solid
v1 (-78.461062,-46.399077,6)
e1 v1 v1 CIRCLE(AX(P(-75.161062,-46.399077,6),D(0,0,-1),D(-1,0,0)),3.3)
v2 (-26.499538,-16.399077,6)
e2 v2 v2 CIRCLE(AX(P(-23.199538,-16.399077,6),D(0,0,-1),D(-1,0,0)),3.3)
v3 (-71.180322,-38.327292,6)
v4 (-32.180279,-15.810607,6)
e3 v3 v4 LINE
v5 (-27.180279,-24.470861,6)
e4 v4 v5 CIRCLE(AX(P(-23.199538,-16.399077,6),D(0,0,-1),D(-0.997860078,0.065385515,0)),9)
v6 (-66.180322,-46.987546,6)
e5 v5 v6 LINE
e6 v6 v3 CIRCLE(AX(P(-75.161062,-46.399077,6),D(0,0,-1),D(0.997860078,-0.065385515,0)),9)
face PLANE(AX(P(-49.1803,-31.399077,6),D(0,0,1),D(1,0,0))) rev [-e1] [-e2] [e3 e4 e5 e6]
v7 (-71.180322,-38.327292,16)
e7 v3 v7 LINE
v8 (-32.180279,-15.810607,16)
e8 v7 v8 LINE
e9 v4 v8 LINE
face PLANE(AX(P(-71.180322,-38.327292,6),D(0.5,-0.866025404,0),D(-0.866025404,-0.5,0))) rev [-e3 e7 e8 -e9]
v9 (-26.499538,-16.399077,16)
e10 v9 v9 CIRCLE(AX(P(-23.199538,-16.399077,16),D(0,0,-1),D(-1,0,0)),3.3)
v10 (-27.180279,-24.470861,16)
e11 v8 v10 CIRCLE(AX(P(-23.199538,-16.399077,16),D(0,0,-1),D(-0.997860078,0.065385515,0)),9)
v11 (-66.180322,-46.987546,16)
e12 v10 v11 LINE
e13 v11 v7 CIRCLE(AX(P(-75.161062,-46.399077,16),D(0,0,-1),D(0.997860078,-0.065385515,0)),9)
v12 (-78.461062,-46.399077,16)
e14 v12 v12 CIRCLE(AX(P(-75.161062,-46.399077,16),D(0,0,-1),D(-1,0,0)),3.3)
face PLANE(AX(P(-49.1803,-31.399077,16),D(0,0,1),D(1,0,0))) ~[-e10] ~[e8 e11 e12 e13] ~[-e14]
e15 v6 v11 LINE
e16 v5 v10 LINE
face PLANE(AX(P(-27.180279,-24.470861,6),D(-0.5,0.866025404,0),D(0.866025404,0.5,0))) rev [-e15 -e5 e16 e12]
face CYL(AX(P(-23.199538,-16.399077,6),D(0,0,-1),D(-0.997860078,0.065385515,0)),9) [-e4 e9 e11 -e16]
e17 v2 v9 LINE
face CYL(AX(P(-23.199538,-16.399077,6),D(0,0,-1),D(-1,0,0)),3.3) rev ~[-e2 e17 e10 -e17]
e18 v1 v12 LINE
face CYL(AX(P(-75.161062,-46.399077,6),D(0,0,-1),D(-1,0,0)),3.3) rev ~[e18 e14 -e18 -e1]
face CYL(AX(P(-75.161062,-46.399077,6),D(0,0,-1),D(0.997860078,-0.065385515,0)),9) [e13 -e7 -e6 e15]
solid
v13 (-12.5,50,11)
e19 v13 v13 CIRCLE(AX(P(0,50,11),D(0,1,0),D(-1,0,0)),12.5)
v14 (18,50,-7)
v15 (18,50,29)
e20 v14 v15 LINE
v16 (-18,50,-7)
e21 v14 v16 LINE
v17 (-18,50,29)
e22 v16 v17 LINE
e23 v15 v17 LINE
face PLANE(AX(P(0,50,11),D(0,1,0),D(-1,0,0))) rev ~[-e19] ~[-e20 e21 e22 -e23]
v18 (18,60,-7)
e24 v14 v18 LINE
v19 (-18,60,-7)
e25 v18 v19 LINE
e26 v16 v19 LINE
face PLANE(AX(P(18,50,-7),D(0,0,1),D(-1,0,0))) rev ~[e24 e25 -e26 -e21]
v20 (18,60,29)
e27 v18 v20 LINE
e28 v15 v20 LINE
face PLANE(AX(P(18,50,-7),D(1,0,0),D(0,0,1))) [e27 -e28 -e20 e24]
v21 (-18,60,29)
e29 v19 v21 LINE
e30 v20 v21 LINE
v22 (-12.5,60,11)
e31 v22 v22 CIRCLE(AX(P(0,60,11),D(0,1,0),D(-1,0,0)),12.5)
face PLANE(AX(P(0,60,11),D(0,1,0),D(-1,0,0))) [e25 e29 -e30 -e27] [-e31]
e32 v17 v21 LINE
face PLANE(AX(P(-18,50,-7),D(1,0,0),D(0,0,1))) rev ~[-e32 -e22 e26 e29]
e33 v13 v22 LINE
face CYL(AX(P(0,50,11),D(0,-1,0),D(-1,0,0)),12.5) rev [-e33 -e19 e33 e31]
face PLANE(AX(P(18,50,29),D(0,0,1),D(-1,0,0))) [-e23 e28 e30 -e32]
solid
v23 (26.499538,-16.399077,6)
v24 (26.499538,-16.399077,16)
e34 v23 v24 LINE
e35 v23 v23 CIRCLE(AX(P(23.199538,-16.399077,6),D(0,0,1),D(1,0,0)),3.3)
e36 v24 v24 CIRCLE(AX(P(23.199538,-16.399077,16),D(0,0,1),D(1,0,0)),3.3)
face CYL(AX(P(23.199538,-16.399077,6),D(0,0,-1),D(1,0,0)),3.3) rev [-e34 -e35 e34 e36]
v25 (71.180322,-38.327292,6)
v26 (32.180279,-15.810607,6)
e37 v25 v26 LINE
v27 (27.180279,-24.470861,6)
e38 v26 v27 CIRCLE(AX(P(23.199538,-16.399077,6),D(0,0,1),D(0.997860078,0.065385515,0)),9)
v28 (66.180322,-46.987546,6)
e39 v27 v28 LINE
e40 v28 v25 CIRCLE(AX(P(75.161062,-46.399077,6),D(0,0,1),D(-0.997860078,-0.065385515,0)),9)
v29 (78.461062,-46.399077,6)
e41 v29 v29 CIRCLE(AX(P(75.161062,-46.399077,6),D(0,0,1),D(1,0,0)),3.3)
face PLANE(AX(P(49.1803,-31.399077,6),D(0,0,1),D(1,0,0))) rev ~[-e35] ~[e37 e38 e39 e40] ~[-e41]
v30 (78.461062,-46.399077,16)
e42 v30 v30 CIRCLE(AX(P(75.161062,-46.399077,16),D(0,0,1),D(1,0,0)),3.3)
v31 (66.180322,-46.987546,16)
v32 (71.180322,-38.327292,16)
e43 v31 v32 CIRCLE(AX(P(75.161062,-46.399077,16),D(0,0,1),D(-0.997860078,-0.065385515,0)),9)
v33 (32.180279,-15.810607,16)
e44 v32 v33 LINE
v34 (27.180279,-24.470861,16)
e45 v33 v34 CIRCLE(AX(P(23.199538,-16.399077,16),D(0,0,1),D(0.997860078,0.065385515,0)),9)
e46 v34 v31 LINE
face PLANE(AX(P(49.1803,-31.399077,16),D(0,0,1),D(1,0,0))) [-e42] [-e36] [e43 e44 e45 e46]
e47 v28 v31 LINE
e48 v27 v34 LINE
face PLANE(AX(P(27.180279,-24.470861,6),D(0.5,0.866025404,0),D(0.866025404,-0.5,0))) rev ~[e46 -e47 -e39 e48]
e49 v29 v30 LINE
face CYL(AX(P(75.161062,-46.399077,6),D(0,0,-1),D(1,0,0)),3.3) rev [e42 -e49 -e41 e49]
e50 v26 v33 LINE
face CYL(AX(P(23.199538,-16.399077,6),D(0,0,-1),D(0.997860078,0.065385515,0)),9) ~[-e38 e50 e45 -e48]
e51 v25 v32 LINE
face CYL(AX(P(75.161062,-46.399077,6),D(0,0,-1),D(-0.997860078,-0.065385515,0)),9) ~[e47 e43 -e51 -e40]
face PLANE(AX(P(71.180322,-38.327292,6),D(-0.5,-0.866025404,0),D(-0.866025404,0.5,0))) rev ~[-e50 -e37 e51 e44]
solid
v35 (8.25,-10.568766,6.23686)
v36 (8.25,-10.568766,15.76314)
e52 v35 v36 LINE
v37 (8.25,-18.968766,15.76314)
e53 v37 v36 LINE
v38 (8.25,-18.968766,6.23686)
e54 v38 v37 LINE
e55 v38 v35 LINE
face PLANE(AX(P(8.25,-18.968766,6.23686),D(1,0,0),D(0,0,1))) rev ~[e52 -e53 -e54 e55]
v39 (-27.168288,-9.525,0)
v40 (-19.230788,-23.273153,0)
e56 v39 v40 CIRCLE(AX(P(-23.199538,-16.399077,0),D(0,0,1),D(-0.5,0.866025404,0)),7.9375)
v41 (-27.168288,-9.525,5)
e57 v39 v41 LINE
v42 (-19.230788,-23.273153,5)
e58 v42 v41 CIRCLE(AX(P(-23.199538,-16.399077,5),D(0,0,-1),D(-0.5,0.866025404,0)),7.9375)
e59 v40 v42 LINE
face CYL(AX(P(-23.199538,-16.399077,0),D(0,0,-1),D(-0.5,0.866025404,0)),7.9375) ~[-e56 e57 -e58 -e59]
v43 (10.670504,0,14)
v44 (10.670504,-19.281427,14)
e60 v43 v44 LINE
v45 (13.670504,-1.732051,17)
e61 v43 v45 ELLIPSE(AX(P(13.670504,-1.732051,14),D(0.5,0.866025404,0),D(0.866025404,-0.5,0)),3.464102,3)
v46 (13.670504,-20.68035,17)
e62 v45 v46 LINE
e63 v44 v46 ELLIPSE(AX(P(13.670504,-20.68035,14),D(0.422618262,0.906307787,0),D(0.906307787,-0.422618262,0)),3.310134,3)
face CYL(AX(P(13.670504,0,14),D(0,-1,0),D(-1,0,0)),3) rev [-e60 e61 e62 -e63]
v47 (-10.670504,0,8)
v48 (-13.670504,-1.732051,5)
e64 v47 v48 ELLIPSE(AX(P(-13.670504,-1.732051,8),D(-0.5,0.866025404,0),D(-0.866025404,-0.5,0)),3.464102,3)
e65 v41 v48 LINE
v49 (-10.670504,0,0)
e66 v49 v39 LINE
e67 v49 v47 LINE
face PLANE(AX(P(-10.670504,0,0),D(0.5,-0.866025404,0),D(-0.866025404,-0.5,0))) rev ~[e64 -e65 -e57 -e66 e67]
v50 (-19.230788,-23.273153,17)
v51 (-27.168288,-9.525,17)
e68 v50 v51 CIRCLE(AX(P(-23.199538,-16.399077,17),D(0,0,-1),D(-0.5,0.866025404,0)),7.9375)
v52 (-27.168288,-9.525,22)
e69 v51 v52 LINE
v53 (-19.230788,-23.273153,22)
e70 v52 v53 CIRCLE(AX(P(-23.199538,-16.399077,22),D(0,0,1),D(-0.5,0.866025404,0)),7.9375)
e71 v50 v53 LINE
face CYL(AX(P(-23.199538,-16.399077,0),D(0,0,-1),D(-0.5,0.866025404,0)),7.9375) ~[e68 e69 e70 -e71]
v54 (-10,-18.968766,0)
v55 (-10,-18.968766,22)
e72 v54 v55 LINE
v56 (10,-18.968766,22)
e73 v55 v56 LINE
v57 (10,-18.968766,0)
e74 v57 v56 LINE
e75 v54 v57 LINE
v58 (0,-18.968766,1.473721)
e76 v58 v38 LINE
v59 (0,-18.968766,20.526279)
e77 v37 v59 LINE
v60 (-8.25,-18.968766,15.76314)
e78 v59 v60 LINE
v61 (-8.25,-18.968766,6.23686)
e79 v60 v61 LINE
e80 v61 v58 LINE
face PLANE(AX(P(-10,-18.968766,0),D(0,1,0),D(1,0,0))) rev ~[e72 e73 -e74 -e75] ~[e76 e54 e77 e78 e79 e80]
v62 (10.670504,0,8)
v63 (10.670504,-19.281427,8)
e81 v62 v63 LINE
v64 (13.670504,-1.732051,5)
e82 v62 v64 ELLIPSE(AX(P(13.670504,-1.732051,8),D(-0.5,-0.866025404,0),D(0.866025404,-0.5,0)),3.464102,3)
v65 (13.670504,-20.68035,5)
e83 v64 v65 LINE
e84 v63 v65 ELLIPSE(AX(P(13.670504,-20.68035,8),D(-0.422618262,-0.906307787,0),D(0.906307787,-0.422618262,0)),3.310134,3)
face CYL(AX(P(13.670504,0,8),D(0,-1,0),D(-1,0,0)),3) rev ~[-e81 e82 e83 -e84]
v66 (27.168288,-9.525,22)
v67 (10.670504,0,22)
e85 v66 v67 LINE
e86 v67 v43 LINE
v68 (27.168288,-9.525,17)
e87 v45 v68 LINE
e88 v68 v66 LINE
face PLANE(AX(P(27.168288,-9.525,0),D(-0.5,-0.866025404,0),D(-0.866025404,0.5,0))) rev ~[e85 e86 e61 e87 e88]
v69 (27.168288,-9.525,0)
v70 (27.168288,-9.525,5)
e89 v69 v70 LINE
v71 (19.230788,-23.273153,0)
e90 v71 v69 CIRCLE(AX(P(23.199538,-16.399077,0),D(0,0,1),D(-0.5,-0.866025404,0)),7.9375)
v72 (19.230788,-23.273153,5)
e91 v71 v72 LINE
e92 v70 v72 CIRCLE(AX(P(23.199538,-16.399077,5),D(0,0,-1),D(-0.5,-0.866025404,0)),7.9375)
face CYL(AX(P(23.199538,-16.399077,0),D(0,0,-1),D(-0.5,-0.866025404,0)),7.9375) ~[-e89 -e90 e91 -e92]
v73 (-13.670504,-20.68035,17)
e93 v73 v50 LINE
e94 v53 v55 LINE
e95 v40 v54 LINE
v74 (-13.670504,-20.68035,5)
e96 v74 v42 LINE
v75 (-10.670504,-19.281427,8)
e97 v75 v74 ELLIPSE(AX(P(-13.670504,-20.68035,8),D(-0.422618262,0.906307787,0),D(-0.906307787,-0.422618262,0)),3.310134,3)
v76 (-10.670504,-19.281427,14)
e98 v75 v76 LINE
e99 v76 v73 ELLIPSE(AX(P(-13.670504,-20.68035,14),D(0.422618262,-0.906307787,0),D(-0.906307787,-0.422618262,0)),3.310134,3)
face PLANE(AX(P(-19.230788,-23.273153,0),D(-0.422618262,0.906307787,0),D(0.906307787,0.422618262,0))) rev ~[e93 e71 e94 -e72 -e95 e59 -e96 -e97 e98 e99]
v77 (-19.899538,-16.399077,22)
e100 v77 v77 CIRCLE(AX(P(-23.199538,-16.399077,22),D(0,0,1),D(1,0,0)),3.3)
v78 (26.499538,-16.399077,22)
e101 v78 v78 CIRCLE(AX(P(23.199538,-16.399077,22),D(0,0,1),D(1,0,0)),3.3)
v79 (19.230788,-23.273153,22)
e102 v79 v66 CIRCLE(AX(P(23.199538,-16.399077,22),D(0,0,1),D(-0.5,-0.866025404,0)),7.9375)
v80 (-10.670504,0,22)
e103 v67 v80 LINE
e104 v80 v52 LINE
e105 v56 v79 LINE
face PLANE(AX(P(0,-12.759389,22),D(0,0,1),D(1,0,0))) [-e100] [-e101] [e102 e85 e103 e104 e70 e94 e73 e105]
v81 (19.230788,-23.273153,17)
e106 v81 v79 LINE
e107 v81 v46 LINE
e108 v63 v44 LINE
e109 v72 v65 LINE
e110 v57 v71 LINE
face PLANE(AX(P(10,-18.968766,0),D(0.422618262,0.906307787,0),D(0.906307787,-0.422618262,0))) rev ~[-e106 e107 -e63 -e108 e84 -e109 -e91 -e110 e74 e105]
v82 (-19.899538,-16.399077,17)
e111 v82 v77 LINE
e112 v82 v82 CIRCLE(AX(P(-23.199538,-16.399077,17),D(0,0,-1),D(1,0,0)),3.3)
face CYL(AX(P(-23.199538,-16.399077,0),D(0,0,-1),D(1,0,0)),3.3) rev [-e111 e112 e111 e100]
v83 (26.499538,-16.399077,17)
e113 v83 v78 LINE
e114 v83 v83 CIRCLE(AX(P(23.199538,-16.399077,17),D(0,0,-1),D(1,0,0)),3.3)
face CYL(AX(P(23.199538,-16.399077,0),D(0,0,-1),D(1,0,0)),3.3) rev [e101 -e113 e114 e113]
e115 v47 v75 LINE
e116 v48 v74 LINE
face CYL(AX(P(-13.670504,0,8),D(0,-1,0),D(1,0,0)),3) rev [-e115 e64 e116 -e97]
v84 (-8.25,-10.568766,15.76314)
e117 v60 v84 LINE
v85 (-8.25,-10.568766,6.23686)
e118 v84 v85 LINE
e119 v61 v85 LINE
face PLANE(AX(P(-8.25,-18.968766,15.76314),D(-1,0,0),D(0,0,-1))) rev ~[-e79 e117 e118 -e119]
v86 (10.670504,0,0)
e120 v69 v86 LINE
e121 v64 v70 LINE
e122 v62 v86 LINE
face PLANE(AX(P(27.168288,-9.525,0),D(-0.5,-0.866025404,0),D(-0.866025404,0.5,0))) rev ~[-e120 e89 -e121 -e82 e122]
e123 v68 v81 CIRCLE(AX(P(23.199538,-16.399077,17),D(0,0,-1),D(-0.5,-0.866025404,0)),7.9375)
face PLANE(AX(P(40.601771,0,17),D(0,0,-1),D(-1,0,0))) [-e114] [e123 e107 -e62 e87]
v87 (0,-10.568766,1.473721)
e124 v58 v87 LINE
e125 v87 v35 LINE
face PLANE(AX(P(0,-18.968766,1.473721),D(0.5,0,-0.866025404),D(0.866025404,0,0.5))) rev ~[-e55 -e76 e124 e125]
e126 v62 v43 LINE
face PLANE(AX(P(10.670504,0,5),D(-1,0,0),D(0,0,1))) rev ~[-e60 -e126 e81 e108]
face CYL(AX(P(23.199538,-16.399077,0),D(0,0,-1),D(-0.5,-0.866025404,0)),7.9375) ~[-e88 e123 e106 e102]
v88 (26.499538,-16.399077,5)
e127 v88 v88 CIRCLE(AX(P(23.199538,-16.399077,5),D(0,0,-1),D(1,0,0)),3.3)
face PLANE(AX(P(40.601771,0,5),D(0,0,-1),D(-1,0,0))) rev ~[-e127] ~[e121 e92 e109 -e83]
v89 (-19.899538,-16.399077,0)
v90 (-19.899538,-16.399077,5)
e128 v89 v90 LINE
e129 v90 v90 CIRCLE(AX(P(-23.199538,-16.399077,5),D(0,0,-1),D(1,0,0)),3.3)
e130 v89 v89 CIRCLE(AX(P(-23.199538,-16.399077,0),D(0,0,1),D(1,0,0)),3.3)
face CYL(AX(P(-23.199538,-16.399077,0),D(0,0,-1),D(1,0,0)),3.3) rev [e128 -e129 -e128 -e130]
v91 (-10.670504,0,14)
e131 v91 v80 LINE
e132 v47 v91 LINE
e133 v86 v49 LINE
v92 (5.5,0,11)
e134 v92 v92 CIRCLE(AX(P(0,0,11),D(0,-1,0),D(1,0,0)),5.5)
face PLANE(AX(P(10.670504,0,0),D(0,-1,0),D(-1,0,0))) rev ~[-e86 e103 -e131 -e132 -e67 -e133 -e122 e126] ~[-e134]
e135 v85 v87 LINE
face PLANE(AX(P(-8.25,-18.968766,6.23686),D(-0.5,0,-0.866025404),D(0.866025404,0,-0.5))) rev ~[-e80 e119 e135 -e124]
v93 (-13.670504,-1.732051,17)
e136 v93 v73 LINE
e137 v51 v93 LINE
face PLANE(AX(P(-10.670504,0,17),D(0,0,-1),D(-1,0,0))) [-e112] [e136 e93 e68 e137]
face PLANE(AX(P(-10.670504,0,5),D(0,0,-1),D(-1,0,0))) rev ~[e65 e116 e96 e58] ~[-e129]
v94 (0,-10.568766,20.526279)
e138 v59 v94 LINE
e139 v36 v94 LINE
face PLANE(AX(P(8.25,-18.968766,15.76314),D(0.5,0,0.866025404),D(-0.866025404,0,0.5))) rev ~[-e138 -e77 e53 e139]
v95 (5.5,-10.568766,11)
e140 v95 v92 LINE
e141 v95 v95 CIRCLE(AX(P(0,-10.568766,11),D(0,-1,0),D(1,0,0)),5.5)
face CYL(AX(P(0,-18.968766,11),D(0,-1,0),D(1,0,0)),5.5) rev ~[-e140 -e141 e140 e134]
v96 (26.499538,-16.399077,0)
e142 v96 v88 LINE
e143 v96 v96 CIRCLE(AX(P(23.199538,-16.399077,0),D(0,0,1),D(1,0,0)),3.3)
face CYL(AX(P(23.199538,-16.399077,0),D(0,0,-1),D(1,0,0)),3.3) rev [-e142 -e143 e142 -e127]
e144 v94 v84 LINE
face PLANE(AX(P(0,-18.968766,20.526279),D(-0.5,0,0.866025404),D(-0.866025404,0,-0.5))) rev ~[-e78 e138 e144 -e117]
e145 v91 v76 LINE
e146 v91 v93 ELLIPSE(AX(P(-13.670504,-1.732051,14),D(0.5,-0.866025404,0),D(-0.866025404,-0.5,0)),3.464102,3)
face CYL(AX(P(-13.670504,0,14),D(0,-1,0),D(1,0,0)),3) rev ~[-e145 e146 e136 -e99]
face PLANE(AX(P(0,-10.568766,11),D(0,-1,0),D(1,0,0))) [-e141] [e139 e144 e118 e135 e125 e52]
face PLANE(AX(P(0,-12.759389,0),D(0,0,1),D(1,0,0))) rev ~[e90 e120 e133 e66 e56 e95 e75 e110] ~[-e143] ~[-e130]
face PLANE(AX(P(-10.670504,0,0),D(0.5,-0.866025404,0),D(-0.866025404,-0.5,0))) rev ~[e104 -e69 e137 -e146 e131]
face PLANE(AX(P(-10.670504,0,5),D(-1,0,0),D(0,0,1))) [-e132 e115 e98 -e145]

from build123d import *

# Parameters (mm, degrees)
F0_R      = 3.3
F1_DEPTH  = 22
F2_R      = 5.5
F3_DEPTH  = 18.9697660486
F4_R      = 5.5
F5_DEPTH  = 8.4
F6_W      = 29.9312670497
F6_H      = 12
F7_DEPTH  = 24.3375766425
F8_R      = 3
F10_R     = 3.3
F11_DEPTH = 10
F14_W     = 36
F14_H     = 36
F14_R     = 12.5
F15_DEPTH = 10


with BuildPart() as f1:
    # F0 (on Top) → F1 (new body)
    with BuildSketch(Plane.XY):
        with BuildLine():
            Line((10.6705042752, 0), (0, 0))
            Line((0, 0), (-10.6705042752, 0))
            Line((-10.6705042752, 0), (-27.1682882173, -9.525))
            ThreePointArc((-27.1682882173, -9.525), (-30.0736148598, -20.3678266425), (-19.2307882173, -23.2731532851))
            Line((-19.2307882173, -23.2731532851), (-10, -18.9687660486))
            Line((-10, -18.9687660486), (0, -18.9687660486))
            Line((0, -18.9687660486), (10, -18.9687660486))
            Line((10, -18.9687660486), (19.2307882173, -23.2731532851))
            ThreePointArc((19.2307882173, -23.2731532851), (30.0736148598, -20.3678266425), (27.1682882173, -9.525))
            Line((27.1682882173, -9.525), (10.6705042752, 0))
        make_face()
        with Locations((-23.1995382173, -16.3990766425)):
            Circle(F0_R, mode=Mode.SUBTRACT)
        with Locations((23.1995382173, -16.3990766425)):
            Circle(F0_R, mode=Mode.SUBTRACT)
    extrude(amount=F1_DEPTH)

    # F2 (on face) → F3 (cut, through all)
    with BuildSketch(Plane.XZ.offset(18.9687660486)):
        with Locations((0, 11)):
            Circle(F2_R)
    extrude(amount=-F3_DEPTH, mode=Mode.SUBTRACT)

    # F4 (on face) → F5 (cut)
    with BuildSketch(Plane.XZ.offset(18.9687660486)):
        Polygon((-8.25, 15.7631397208), (-8.25, 6.2368602792), (0, 1.4737205584), (8.25, 6.2368602792), (8.25, 15.7631397208), (0, 20.5262794416), align=None)
        with Locations((0, 11)):
            Circle(F4_R, mode=Mode.SUBTRACT)
    extrude(amount=-F5_DEPTH, mode=Mode.SUBTRACT)

    # F6 (on face) → F7 (cut, through all)
    with BuildSketch(Plane(origin=(0, 0, 0), x_dir=(-1, 0, 0), z_dir=(0, 1, 0))):
        with Locations((-25.6361378, 11)):
            Rectangle(F6_W, F6_H)
        with Locations((25.6361378, 11)):
            Rectangle(F6_W, F6_H)
    extrude(amount=-F7_DEPTH, mode=Mode.SUBTRACT)

    # F8
    f8_edges = [f1.edges().sort_by_distance(p)[0] for p in [
        (10.670504, -9.640714, 5),
        (10.670504, -9.640714, 17),
        (-10.670504, -9.640714, 17),
        (-10.670504, -9.640714, 5),
    ]]
    fillet(f8_edges, radius=F8_R)


with BuildPart() as f11:
    # F10 (on offset) → F11 (new body)
    with BuildSketch(Plane.XY.offset(6)):
        with BuildLine():
            Line((71.1803217459, -38.3272922368), (32.1802789157, -15.8106070104))
            ThreePointArc((32.1802789157, -15.8106070104), (15.4053095832, -11.8990766425), (27.1802789157, -24.4708610482))
            Line((27.1802789157, -24.4708610482), (66.1803217459, -46.9875462747))
            ThreePointArc((66.1803217459, -46.9875462747), (82.9552910784, -50.8990766425), (71.1803217459, -38.3272922368))
        make_face()
        with Locations((75.1610624444, -46.3990766425)):
            Circle(F10_R, mode=Mode.SUBTRACT)
        with Locations((23.1995382173, -16.3990766425)):
            Circle(F10_R, mode=Mode.SUBTRACT)
    extrude(amount=F11_DEPTH)


with BuildPart() as f12_1:
    # F12: instance of F11
    add(f11.part.mirror(Plane.YZ))


with BuildPart() as f15:
    # F14 (on offset) → F15 (new body)
    with BuildSketch(Plane(origin=(0, 50, 0), x_dir=(-1, 0, 0), z_dir=(0, 1, 0))):
        with Locations((0, 11)):
            Rectangle(F14_W, F14_H)
        with Locations((0, 11)):
            Circle(F14_R, mode=Mode.SUBTRACT)
    extrude(amount=F15_DEPTH)


solid = Compound([f1.part, f11.part, f12_1.part, f15.part])
